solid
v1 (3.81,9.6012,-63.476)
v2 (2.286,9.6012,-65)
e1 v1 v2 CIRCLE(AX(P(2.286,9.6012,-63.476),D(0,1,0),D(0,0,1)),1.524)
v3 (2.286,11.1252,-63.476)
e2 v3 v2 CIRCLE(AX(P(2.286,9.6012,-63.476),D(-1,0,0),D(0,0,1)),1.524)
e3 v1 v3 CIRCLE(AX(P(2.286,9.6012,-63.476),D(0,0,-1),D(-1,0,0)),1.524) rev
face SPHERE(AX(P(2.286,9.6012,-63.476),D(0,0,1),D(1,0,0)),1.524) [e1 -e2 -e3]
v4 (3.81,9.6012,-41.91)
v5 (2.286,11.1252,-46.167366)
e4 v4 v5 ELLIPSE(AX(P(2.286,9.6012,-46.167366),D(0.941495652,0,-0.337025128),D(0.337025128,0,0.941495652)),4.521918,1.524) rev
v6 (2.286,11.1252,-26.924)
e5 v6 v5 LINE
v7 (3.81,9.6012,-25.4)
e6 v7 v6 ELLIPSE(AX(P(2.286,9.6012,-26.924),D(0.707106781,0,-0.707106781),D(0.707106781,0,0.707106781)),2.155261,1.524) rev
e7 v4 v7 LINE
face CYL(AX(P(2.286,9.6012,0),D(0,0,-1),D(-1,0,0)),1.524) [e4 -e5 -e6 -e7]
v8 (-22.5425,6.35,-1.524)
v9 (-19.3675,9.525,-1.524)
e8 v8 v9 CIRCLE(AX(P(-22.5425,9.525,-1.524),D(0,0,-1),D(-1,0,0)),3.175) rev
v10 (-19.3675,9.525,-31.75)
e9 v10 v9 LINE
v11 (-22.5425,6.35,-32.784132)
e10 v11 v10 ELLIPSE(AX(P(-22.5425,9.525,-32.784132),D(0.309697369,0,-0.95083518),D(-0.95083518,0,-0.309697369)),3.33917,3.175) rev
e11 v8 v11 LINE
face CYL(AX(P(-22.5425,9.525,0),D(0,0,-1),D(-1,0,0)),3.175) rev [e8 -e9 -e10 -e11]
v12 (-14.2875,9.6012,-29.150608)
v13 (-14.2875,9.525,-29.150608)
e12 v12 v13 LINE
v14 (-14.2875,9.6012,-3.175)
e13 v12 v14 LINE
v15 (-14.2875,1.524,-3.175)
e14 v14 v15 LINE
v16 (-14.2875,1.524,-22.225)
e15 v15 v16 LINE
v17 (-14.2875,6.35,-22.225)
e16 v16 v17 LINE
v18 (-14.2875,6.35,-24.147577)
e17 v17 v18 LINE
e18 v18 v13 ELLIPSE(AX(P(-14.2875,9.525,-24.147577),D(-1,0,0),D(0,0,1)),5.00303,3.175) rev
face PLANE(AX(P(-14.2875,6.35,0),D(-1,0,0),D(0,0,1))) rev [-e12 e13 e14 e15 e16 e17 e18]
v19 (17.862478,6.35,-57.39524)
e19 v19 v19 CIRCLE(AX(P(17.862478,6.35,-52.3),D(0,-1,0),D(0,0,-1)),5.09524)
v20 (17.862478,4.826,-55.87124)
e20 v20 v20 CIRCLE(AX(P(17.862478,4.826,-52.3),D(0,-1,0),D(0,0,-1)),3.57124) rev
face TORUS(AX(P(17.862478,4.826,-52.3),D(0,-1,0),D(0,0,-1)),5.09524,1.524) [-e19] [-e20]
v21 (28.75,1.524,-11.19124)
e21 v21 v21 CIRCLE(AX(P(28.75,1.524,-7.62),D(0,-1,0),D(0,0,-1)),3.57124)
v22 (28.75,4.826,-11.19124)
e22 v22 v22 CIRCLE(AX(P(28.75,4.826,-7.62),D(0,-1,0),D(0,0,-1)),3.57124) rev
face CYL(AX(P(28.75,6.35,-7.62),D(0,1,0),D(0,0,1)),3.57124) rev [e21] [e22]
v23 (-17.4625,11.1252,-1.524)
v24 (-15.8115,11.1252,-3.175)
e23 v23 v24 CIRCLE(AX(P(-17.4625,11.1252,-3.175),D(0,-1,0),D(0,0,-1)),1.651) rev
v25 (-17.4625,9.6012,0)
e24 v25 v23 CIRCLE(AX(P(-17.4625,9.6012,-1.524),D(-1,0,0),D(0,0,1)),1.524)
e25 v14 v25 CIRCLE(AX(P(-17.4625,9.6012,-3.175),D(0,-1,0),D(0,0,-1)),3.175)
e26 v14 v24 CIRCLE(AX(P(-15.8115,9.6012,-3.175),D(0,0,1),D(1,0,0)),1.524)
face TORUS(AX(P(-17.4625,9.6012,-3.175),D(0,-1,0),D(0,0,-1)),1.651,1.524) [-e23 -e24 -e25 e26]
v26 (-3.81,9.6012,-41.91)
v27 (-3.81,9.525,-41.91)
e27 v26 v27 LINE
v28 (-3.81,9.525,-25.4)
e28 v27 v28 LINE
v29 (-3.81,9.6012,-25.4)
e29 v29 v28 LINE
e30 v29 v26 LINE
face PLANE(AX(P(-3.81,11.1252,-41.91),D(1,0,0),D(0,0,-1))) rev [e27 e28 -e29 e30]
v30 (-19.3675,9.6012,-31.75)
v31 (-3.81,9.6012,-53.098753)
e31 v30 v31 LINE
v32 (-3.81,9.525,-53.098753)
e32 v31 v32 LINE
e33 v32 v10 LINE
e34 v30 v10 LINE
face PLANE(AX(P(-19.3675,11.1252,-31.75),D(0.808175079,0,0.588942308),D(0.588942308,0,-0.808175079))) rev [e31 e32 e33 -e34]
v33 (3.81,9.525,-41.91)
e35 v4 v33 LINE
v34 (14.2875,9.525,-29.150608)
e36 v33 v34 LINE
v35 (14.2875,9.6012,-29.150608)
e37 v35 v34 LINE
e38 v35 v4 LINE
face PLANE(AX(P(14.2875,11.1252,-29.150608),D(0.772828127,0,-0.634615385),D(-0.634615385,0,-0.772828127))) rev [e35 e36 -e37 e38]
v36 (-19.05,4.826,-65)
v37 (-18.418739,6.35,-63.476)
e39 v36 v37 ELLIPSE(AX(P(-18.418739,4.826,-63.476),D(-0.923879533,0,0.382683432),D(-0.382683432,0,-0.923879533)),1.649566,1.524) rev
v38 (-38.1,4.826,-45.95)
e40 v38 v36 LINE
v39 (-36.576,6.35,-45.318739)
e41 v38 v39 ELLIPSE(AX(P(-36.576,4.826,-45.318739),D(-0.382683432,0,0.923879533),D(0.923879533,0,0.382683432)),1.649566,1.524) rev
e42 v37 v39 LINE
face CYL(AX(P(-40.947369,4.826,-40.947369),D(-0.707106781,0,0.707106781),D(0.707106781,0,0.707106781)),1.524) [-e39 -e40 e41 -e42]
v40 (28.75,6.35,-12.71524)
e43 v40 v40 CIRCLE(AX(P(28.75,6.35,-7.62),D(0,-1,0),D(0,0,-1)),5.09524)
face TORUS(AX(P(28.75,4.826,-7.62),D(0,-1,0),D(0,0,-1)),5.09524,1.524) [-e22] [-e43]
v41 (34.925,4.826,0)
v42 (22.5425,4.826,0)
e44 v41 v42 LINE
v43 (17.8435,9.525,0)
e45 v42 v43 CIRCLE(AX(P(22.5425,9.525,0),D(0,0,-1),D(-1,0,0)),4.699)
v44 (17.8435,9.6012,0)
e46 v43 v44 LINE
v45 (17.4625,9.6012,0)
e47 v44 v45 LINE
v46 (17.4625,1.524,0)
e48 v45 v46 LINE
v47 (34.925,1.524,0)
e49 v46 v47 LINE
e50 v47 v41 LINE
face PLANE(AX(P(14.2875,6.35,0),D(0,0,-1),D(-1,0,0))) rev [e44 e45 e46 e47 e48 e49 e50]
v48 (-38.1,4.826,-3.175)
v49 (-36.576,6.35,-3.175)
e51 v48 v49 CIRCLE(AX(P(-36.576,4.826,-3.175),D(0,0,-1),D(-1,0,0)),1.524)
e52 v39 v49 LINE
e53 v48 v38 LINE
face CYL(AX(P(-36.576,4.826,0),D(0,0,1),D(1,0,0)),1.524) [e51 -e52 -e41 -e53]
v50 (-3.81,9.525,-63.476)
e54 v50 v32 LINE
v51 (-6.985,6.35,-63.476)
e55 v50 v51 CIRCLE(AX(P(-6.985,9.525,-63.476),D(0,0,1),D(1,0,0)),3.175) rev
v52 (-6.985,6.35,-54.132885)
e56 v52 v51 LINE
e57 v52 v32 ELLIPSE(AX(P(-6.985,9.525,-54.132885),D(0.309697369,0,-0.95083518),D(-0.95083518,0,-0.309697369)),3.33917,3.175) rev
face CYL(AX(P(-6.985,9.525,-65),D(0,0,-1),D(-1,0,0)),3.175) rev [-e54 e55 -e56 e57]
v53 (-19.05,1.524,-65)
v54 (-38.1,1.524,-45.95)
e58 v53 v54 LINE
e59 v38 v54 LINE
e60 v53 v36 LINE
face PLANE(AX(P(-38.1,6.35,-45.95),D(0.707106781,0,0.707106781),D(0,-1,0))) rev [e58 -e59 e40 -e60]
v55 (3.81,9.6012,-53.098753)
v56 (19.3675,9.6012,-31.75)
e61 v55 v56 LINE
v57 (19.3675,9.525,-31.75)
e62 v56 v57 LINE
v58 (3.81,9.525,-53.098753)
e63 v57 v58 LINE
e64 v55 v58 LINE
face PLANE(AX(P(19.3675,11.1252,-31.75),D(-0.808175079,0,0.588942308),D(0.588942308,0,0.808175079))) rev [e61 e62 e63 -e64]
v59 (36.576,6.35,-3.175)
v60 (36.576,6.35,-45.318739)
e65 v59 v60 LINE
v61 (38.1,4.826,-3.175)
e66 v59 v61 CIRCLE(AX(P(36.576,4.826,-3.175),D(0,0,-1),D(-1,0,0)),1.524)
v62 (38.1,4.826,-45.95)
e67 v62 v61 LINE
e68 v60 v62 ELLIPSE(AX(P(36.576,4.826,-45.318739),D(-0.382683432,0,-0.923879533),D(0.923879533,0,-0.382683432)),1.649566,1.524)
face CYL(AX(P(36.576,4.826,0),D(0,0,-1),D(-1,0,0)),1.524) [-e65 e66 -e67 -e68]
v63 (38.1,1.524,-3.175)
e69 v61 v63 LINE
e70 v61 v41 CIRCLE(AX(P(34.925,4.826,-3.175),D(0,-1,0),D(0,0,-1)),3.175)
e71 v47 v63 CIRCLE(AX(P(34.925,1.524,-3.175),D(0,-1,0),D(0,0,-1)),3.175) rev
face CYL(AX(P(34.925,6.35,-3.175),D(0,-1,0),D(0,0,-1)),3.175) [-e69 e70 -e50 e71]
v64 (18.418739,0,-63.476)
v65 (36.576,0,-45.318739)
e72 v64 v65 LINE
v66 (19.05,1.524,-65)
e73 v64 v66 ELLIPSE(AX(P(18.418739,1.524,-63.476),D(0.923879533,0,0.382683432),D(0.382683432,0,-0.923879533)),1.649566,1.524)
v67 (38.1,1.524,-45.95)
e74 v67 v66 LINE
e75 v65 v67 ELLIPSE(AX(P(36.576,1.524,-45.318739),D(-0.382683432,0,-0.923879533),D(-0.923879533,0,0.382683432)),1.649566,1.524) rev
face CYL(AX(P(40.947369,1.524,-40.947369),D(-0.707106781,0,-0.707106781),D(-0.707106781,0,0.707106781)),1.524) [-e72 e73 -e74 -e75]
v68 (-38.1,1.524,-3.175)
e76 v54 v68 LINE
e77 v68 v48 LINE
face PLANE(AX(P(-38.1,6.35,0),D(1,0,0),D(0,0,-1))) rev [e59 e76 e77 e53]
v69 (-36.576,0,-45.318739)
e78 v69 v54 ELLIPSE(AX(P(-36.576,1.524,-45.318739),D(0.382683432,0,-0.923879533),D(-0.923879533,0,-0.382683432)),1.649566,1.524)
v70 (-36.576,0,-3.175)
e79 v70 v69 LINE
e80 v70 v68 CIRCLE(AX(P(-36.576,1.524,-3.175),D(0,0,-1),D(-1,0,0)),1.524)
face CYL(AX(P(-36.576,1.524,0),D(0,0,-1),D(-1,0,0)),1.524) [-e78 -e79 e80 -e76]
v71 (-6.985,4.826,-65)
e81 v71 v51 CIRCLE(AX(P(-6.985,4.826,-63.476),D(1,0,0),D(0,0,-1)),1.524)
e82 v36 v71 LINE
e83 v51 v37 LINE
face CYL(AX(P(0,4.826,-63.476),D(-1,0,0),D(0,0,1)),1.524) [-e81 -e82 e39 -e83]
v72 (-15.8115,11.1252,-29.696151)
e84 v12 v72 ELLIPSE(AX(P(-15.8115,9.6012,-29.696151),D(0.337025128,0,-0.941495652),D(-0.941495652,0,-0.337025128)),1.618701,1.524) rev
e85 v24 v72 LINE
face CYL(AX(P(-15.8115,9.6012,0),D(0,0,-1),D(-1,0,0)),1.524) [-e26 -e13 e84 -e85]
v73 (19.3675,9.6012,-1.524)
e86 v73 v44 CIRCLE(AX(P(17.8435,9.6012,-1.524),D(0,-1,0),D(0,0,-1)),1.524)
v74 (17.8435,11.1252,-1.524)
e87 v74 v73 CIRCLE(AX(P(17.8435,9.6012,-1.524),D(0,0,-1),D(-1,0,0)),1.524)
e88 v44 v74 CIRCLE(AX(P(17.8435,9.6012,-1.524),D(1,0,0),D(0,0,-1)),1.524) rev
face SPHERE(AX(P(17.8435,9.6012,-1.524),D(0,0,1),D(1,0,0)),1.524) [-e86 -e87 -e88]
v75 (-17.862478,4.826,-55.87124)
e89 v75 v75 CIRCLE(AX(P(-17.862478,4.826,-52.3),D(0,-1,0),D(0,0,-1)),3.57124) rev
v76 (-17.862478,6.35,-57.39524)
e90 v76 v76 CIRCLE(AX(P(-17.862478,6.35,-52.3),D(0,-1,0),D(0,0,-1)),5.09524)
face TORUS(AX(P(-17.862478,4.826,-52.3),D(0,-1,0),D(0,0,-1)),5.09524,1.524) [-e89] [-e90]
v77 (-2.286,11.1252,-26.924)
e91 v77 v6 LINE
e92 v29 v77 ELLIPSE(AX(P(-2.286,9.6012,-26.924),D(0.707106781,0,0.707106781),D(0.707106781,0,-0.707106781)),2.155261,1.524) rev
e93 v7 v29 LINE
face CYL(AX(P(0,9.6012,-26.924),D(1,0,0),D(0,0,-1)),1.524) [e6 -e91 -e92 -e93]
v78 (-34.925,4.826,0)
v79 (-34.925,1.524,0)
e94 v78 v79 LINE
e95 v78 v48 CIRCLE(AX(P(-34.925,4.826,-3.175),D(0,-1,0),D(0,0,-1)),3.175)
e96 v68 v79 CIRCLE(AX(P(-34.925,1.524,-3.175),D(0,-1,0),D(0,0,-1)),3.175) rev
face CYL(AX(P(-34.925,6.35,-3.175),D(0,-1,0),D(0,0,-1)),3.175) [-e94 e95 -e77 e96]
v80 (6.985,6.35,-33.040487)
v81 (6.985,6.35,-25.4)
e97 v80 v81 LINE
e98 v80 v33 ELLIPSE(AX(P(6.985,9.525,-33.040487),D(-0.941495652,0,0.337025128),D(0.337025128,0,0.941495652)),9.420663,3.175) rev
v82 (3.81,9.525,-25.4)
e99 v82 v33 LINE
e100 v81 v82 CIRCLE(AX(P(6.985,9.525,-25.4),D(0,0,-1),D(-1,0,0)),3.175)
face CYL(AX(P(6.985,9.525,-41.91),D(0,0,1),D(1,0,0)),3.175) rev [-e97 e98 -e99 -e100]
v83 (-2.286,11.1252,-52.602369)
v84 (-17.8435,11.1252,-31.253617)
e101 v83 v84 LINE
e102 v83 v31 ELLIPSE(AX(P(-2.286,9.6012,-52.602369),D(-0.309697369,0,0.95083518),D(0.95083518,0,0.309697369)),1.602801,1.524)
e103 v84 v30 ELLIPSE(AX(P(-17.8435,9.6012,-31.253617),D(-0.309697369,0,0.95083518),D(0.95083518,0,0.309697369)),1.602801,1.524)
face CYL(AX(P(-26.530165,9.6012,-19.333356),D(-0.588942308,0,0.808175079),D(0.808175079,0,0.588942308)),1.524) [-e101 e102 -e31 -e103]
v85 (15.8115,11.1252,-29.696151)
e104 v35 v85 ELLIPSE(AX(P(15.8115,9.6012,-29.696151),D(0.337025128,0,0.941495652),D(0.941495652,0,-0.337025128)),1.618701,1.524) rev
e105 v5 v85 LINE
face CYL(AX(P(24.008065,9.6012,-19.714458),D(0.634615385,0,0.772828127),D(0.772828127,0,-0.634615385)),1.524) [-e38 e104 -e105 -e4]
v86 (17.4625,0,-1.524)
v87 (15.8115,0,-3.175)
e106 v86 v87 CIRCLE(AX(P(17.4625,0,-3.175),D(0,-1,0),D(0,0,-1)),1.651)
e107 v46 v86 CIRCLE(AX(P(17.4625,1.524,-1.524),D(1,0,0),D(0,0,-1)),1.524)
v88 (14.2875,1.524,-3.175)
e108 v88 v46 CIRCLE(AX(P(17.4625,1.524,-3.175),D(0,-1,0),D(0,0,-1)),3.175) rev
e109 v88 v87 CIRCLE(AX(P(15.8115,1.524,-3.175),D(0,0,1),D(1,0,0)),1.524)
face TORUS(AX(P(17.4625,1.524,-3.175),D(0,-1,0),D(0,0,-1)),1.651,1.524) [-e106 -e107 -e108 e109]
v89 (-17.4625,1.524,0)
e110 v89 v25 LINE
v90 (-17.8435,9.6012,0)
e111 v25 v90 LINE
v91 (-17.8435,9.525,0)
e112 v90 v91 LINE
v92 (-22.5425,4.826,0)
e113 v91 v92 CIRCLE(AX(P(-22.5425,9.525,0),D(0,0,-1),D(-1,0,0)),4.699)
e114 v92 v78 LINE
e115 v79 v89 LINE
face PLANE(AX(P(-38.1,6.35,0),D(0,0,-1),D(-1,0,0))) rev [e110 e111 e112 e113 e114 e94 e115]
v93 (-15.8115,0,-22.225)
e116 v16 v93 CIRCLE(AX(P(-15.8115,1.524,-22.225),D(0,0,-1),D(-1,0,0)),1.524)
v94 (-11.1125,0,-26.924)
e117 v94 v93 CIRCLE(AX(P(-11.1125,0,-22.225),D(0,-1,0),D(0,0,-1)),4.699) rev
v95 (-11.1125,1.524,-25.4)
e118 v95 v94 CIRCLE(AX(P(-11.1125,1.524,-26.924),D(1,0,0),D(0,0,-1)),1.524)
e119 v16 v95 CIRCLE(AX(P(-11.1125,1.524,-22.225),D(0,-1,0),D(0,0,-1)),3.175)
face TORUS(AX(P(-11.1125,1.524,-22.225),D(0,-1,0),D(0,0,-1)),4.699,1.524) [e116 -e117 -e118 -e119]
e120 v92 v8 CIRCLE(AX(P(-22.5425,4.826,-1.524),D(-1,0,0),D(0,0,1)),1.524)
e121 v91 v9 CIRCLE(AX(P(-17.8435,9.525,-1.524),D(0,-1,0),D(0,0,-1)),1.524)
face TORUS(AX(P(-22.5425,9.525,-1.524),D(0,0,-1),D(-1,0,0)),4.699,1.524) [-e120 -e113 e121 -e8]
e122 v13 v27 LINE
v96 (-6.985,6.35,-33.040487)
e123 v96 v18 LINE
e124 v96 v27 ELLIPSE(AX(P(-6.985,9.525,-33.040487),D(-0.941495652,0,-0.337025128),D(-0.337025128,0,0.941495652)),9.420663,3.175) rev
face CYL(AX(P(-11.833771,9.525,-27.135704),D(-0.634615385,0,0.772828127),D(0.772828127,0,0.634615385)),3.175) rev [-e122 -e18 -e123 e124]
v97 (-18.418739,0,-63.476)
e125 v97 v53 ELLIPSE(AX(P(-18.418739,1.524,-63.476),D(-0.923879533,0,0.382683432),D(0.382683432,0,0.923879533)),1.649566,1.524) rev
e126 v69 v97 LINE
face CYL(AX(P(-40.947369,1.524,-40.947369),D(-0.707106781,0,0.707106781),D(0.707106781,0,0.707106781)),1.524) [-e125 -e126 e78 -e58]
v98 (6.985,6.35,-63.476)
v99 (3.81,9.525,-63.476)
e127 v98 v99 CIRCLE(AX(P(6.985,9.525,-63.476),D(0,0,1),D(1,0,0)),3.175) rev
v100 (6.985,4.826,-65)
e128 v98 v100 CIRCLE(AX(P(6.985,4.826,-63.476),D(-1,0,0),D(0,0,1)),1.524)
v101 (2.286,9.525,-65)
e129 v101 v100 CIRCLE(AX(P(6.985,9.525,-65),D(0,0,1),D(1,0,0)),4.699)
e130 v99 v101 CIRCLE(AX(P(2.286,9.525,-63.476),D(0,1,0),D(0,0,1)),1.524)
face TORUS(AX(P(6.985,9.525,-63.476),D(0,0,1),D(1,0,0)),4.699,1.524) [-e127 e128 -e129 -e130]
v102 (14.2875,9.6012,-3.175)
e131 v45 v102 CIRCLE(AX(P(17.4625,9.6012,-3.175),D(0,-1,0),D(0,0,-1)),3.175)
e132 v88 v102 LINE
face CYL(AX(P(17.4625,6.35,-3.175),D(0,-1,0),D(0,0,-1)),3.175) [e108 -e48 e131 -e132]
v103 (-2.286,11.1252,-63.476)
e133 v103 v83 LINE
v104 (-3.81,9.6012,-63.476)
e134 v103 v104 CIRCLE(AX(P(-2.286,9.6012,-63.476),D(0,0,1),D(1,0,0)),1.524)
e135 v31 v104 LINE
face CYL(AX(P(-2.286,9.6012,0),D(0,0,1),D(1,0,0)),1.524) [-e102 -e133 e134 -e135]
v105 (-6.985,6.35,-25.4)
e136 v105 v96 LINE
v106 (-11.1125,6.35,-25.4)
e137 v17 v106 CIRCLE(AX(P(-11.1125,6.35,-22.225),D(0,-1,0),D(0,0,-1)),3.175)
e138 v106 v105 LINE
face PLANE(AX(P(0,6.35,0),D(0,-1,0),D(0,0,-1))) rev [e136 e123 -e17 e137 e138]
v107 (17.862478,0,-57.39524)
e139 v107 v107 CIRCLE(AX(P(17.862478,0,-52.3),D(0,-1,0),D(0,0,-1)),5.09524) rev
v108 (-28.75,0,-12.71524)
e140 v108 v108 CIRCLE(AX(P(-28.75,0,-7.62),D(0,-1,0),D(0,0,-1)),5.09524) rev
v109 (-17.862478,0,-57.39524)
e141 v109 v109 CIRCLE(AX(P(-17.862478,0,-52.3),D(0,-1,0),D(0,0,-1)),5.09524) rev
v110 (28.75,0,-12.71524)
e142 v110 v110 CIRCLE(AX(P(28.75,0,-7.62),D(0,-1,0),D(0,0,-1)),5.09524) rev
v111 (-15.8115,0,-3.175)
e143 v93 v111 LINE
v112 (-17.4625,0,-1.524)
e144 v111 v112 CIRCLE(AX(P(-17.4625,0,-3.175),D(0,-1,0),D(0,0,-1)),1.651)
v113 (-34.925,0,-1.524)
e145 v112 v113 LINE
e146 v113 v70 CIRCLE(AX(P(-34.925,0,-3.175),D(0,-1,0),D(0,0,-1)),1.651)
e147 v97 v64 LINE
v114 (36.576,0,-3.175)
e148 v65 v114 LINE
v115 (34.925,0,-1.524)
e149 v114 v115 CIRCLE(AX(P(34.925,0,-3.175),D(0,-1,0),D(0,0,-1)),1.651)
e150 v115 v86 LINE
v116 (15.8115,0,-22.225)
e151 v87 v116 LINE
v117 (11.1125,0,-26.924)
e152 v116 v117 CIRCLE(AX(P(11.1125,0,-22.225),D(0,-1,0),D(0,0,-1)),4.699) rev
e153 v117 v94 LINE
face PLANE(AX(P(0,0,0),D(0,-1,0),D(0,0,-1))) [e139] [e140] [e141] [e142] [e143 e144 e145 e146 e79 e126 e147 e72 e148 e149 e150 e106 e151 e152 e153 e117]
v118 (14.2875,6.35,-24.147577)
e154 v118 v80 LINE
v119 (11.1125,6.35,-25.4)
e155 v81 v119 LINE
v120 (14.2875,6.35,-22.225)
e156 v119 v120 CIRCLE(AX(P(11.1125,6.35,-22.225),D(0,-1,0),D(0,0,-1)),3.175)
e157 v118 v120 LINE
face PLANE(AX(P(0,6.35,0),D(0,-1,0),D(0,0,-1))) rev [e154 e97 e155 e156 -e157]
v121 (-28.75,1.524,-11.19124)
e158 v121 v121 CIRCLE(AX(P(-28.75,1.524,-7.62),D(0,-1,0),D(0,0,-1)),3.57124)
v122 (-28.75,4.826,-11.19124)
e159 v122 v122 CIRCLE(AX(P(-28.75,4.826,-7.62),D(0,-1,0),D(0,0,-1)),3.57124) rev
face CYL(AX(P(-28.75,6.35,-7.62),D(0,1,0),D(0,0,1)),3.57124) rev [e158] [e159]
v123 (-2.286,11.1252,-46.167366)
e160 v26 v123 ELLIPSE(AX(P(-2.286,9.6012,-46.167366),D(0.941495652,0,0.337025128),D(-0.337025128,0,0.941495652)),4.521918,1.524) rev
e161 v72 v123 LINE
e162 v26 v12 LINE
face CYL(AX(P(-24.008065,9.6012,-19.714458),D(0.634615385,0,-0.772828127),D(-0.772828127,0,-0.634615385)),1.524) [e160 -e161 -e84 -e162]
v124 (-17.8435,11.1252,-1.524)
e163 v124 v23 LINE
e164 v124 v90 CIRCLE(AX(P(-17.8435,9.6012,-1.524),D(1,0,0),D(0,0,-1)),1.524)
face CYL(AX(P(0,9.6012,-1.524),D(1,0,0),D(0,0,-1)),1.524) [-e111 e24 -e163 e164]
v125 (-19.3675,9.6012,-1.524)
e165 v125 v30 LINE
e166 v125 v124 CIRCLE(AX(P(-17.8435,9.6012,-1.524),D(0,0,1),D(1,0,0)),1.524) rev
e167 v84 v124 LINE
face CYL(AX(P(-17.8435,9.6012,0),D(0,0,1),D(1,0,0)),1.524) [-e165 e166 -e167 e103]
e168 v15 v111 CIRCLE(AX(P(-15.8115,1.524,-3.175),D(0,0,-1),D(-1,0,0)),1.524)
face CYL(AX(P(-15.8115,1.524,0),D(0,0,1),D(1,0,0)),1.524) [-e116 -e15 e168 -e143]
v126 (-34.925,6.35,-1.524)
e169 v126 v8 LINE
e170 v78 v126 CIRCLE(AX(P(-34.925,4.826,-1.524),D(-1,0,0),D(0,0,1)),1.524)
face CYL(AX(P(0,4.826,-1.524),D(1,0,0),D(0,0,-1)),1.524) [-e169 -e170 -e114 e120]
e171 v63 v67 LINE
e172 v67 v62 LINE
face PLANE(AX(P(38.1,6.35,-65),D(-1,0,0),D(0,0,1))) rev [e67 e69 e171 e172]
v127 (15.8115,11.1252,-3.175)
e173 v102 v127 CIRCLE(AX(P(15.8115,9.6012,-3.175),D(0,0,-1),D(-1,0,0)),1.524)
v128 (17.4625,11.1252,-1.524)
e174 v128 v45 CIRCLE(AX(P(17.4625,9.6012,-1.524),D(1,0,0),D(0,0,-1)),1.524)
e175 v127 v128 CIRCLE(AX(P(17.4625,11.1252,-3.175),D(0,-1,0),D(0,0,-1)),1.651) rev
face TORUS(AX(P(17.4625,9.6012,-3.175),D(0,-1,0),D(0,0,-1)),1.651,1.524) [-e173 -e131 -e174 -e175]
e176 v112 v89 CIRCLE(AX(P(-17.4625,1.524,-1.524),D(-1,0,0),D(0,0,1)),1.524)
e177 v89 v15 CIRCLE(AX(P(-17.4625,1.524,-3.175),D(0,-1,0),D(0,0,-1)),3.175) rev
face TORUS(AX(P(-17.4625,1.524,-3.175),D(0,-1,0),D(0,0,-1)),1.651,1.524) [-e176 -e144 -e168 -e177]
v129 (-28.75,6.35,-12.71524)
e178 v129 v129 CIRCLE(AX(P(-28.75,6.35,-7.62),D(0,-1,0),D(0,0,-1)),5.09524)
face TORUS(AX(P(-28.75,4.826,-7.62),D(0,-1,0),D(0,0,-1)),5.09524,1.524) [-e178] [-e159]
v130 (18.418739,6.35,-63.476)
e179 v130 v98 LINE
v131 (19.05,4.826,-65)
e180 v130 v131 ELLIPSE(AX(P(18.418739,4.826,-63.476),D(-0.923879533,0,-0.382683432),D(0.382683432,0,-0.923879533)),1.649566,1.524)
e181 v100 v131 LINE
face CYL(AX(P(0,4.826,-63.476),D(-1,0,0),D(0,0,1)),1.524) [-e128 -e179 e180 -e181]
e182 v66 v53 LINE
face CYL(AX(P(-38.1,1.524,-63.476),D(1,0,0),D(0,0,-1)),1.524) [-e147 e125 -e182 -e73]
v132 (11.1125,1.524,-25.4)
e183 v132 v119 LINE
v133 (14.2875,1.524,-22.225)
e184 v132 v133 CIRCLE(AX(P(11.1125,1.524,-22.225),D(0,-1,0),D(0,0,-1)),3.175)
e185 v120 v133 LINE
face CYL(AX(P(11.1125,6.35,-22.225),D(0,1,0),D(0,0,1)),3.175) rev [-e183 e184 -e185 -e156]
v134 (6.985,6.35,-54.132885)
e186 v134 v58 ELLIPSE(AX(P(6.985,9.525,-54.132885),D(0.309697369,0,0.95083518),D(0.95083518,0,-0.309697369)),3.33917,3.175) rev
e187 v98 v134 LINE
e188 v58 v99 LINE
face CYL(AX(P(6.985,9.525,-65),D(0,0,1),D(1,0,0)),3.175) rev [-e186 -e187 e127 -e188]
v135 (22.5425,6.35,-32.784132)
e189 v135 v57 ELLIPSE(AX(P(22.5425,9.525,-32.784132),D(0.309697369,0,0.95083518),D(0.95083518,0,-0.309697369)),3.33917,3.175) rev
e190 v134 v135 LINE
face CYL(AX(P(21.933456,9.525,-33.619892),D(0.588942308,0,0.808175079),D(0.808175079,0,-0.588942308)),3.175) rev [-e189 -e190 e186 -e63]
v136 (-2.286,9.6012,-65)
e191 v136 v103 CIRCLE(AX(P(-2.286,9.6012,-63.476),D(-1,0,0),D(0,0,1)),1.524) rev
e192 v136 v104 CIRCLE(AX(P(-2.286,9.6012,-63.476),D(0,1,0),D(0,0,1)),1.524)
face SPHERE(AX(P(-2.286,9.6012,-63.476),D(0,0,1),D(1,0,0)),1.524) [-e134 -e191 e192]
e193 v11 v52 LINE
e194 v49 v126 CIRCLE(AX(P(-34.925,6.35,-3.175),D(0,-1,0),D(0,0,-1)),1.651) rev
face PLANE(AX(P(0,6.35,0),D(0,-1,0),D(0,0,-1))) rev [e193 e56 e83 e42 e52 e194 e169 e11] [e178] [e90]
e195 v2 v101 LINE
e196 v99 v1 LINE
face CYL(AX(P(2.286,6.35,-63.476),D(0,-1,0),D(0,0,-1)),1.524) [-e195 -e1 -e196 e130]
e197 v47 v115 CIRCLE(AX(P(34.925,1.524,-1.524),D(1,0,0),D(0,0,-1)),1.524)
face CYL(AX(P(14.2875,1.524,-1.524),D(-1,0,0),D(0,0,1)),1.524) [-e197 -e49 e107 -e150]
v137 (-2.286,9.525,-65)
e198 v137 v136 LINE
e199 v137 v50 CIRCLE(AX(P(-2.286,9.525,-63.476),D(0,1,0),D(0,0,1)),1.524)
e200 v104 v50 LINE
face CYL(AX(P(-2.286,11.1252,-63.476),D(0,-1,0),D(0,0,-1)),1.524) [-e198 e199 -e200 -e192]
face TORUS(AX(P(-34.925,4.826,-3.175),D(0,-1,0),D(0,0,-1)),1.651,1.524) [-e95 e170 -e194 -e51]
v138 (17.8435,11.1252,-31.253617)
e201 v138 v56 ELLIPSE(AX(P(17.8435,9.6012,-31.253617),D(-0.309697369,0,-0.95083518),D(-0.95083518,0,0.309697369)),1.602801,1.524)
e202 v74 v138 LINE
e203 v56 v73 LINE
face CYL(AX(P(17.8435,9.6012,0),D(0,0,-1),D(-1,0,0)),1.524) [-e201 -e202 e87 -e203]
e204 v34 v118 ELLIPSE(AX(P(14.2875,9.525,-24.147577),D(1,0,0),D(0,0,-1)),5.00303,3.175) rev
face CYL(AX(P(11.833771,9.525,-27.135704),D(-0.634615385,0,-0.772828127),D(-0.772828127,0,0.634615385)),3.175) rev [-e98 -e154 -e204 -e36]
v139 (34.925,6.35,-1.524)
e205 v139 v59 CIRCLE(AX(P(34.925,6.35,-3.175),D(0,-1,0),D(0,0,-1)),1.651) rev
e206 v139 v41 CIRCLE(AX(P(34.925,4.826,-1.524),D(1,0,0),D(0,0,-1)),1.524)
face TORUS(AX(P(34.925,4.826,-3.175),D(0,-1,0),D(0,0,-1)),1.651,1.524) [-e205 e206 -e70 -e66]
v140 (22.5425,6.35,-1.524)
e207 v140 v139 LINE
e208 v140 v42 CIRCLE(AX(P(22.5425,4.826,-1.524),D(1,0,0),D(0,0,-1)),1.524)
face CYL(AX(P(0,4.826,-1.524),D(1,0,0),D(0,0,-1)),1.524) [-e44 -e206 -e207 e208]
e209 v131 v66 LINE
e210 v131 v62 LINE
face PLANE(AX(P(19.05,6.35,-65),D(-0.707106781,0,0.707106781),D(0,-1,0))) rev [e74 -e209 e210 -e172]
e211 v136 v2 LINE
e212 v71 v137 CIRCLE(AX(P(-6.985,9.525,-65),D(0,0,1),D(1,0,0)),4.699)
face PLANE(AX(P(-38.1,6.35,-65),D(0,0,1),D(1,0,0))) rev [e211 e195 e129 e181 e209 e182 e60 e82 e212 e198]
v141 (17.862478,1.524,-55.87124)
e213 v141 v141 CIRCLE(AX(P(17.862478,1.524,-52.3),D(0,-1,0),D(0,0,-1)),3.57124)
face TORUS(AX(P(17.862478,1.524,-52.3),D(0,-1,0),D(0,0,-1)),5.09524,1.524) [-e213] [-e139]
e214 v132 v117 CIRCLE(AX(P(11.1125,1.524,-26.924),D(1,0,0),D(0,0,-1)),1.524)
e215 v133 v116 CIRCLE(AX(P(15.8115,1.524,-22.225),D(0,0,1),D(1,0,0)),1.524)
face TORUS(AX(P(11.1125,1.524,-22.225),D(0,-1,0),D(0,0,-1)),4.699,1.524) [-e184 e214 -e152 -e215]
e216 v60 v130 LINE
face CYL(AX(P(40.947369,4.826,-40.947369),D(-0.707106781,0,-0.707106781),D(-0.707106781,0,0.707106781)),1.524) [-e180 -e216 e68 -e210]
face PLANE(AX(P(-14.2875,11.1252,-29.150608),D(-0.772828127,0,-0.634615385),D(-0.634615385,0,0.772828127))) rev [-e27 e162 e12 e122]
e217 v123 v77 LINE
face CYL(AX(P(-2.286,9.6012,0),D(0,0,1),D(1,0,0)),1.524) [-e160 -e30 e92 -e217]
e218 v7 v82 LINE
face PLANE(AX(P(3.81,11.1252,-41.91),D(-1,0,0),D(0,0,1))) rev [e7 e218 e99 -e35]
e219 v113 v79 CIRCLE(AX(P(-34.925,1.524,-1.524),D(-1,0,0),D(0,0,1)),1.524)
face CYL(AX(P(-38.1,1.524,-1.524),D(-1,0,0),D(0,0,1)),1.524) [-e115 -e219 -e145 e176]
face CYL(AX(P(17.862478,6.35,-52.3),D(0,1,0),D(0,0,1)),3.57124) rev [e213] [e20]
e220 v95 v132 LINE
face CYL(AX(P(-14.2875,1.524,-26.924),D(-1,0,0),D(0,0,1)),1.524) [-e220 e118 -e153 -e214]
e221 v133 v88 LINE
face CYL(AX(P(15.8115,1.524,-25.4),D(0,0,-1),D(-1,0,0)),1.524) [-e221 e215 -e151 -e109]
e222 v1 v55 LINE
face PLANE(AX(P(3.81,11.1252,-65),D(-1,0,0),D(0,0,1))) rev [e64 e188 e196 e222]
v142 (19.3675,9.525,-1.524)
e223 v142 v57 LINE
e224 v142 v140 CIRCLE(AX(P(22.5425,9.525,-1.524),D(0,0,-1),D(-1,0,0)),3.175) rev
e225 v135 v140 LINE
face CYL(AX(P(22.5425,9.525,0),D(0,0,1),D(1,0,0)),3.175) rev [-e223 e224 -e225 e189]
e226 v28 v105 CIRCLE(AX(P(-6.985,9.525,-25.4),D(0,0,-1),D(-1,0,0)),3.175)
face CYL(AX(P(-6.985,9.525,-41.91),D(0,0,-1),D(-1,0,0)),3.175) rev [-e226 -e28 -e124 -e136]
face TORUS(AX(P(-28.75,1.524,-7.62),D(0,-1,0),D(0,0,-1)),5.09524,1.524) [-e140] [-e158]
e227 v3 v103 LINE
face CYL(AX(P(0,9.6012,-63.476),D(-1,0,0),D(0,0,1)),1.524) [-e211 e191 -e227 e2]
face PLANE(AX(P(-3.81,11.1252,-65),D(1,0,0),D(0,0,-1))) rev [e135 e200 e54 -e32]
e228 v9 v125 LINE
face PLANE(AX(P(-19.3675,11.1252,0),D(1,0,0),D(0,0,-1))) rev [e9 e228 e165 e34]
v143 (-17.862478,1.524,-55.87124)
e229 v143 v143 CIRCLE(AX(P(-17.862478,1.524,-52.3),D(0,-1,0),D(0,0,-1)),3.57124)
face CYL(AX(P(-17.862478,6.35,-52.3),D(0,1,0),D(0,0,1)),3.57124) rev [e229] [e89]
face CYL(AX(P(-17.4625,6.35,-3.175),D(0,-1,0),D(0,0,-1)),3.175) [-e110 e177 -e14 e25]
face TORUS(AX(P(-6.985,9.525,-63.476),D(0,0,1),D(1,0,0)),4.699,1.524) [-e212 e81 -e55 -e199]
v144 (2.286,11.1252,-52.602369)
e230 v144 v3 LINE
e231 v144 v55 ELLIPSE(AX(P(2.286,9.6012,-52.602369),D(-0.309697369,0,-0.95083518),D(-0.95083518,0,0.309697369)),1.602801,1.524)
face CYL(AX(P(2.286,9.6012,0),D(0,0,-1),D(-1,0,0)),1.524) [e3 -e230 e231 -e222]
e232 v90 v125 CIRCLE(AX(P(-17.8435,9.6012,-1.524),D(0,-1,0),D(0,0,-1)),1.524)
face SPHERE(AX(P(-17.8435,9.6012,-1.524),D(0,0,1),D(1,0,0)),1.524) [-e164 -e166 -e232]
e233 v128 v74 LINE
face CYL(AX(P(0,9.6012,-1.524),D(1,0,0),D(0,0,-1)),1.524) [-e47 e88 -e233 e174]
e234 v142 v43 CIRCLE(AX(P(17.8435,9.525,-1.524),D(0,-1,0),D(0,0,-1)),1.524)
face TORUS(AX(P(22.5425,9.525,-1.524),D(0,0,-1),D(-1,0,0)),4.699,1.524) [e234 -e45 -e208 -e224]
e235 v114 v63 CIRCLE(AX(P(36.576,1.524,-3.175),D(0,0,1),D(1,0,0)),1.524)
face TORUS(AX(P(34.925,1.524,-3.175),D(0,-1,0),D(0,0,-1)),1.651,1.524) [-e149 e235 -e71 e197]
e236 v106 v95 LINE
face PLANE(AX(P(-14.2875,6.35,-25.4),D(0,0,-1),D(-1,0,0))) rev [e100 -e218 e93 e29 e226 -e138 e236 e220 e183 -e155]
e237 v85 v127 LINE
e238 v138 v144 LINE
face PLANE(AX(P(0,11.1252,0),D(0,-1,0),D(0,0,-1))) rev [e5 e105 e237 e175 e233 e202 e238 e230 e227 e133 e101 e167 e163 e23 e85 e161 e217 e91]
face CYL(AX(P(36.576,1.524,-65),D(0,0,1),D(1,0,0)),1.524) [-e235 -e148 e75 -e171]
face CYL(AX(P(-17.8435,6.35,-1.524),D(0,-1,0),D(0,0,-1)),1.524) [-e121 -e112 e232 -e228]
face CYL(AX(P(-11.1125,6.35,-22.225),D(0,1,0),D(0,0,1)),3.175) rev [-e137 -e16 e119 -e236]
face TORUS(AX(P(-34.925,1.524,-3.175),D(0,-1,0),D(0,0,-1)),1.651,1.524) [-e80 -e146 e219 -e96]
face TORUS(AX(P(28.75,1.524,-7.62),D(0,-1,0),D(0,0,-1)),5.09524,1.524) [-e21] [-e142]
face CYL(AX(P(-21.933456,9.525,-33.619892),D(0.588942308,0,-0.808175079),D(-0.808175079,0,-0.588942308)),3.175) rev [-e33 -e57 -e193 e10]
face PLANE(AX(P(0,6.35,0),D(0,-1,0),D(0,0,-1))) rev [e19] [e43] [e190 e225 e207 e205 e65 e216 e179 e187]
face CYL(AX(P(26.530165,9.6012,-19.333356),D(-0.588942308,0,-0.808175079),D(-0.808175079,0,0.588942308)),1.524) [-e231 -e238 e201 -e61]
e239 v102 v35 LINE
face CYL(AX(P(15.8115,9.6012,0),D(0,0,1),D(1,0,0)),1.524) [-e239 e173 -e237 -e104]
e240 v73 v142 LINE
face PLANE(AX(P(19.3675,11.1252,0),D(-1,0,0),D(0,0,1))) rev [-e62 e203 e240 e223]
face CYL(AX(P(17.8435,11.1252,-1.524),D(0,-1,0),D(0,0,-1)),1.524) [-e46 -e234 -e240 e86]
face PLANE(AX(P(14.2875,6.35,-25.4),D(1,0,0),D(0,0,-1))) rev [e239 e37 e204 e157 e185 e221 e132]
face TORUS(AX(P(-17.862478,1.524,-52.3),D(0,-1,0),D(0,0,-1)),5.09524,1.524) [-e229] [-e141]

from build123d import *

# Parameters (mm, degrees)
BOSS_EXTRUDE1_DEPTH     = 6.35
F_1_4_CLEARANCE_HOLE1_D = 7.14248
FILLET1_R               = 3.175
BOSS_EXTRUDE2_DEPTH     = 4.7752
CHAMFER1_SIZE           = 19.05
FILLET2_R               = 3.175
FILLET3_R               = 1.524
FILLET4_R               = 1.524


with BuildPart() as part:
    # Sketch1 → Boss-Extrude1 (new body)
    with BuildSketch(Plane(origin=(0, 0, 0), x_dir=(1, 0, 0), z_dir=(0, 1, 0))):
        Polygon((-38.1, 0), (-14.2875, 0), (-14.2875, 25.4), (14.2875, 25.4), (14.2875, 0), (38.1, 0), (38.1, 65), (-38.1, 65), align=None)
    extrude(amount=BOSS_EXTRUDE1_DEPTH)

    # 1/4 Clearance Hole1 (through all)
    with Locations(Plane(origin=(0, 6.35, 0), x_dir=(1, 0, 0), z_dir=(0, 1, 0))):
        with Locations((-28.75, 7.62), (28.75, 7.62), (17.862477609, 52.3), (-17.862477609, 52.3)):
            Hole(F_1_4_CLEARANCE_HOLE1_D / 2)

    # Fillet1
    fillet1_edges = [part.edges().sort_by_distance(p)[0] for p in [
        (14.2875, 3.175, -25.4),
        (-14.2875, 3.175, -25.4),
    ]]
    fillet(fillet1_edges, radius=FILLET1_R)

    # Sketch4 → Boss-Extrude2 (add)
    with BuildSketch(Plane(origin=(0, 6.35, 0), x_dir=(1, 0, 0), z_dir=(0, 1, 0))):
        Polygon((-14.2875, 29.150607626), (-3.81, 41.91), (-3.81, 25.4), (3.81, 25.4), (3.81, 41.91), (14.2875, 29.150607626), (14.2875, 0), (19.3675, 0), (19.3675, 31.75), (3.81, 53.098752885), (3.81, 65), (-3.81, 65), (-3.81, 53.098752885), (-19.3675, 31.75), (-19.3675, 0), (-14.2875, 0), align=None)
    extrude(amount=BOSS_EXTRUDE2_DEPTH)

    # Chamfer1
    chamfer1_edges = [part.edges().sort_by_distance(p)[0] for p in [
        (-38.1, 3.175, -65),
        (38.1, 3.175, -65),
    ]]
    chamfer(chamfer1_edges, length=CHAMFER1_SIZE)

    # Fillet2
    fillet2_edges = [part.edges().sort_by_distance(p)[0] for p in [
        (38.1, 3.175, 0),
        (14.2875, 5.5626, 0),
        (-14.2875, 5.5626, 0),
        (-38.1, 3.175, 0),
        (-9.04875, 6.35, -35.530303813),
        (-3.81, 6.35, -33.655),
        (3.81, 6.35, -33.655),
        (9.04875, 6.35, -35.530303813),
        (19.3675, 6.35, -15.875),
        (11.58875, 6.35, -42.424376443),
        (3.81, 6.35, -59.049376443),
        (-3.81, 6.35, -59.049376443),
        (-11.58875, 6.35, -42.424376443),
        (-19.3675, 6.35, -15.875),
    ]]
    fillet(fillet2_edges, radius=FILLET2_R)

    # Fillet3
    fillet3_edges = [part.edges().sort_by_distance(p)[0] for p in [
        (18.415, 11.1252, 0),
        (-14.2875, 11.1252, -16.162803813),
        (-15.21743597, 11.1252, -0.92993597),
        (15.21743597, 11.1252, -0.92993597),
        (-9.04875, 11.1252, -35.530303813),
        (-3.81, 11.1252, -33.655),
        (0, 11.1252, -25.4),
        (3.81, 11.1252, -33.655),
        (9.04875, 11.1252, -35.530303813),
        (14.2875, 11.1252, -16.162803813),
        (19.3675, 11.1252, -15.875),
        (11.58875, 11.1252, -42.424376443),
        (3.81, 11.1252, -59.049376443),
        (0, 11.1252, -65),
        (-3.81, 11.1252, -59.049376443),
        (-11.58875, 11.1252, -42.424376443),
        (-19.3675, 11.1252, -15.875),
        (-18.415, 11.1252, 0),
    ]]
    fillet(fillet3_edges, radius=FILLET3_R)

    # Fillet4
    # the kernel refuses this fillet: 1.524 mm, written as the material it takes off along each edge
    with BuildSketch(Plane(origin=(17.8435, 9.6012, -1.524), x_dir=(1, 0, 0), z_dir=(0, 0, 1))) as fillet4_piece_1_section:
        Polygon((0, 0), (FILLET4_R, 0), (FILLET4_R, FILLET4_R), (0, FILLET4_R), align=None)
    fillet4_piece_1 = extrude(amount=FILLET4_R, mode=Mode.PRIVATE)
    fillet4_piece_1 = fillet4_piece_1 - Plane(origin=(17.8435, 9.6012, -1.524), x_dir=(-0.7071067811865475, -0.7071067811865475, 0), z_dir=(0, 0, 1)) * Sphere(FILLET4_R, mode=Mode.PRIVATE)
    add(fillet4_piece_1, mode=Mode.SUBTRACT)
    with BuildSketch(Plane(origin=(2.286, 9.6012, -63.476), x_dir=(1, 0, 0), z_dir=(0, 0, -1))) as fillet4_piece_2_section:
        Polygon((0, 0), (FILLET4_R, 0), (FILLET4_R, -FILLET4_R), (0, -FILLET4_R), align=None)
    fillet4_piece_2 = extrude(amount=FILLET4_R, mode=Mode.PRIVATE)
    fillet4_piece_2 = fillet4_piece_2 - Plane(origin=(2.286, 9.6012, -63.476), x_dir=(-0.7071067811865475, -0.7071067811865475, 0), z_dir=(0, 0, -1)) * Sphere(FILLET4_R, mode=Mode.PRIVATE)
    add(fillet4_piece_2, mode=Mode.SUBTRACT)
    with BuildSketch(Plane(origin=(-2.286, 9.6012, -63.476), x_dir=(-1, 0, 0), z_dir=(0, 0, -1))) as fillet4_piece_3_section:
        Polygon((0, 0), (FILLET4_R, 0), (FILLET4_R, FILLET4_R), (0, FILLET4_R), align=None)
    fillet4_piece_3 = extrude(amount=FILLET4_R, mode=Mode.PRIVATE)
    fillet4_piece_3 = fillet4_piece_3 - Plane(origin=(-2.286, 9.6012, -63.476), x_dir=(0.7071067811865475, -0.7071067811865475, 0), z_dir=(0, 0, -1)) * Sphere(FILLET4_R, mode=Mode.PRIVATE)
    add(fillet4_piece_3, mode=Mode.SUBTRACT)
    with BuildSketch(Plane(origin=(-17.8435, 9.6012, -1.524), x_dir=(-1, 0, 0), z_dir=(0, 0, 1))) as fillet4_piece_4_section:
        Polygon((0, 0), (FILLET4_R, 0), (FILLET4_R, -FILLET4_R), (0, -FILLET4_R), align=None)
    fillet4_piece_4 = extrude(amount=FILLET4_R, mode=Mode.PRIVATE)
    fillet4_piece_4 = fillet4_piece_4 - Plane(origin=(-17.8435, 9.6012, -1.524), x_dir=(0.7071067811865475, -0.7071067811865475, 0), z_dir=(0, 0, 1)) * Sphere(FILLET4_R, mode=Mode.PRIVATE)
    add(fillet4_piece_4, mode=Mode.SUBTRACT)
    with BuildSketch(Plane(origin=(-38.1, 0, -49.76), x_dir=(1, 0, 0), z_dir=(0, 0, 1)), Plane(origin=(38.1, 0, -3.175), x_dir=(-1, 0, 0), z_dir=(0, 0, -1)), Plane(origin=(38.1, 6.35, -3.175), x_dir=(0, -1, 0), z_dir=(0, 0, -1))) as fillet4_piece_5:
        with BuildLine():
            CenterArc((FILLET4_R, FILLET4_R), FILLET4_R, 180, 90)
            Line((0, FILLET4_R), (0, 0))
            Line((0, 0), (FILLET4_R, 0))
        make_face()
    extrude(amount=46.585, mode=Mode.SUBTRACT)
    with BuildSketch(Plane(origin=(-38.1, 6.35, -49.76), x_dir=(1, 0, 0), z_dir=(0, 0, 1))) as fillet4_piece_6:
        with BuildLine():
            CenterArc((FILLET4_R, -FILLET4_R), FILLET4_R, 90, 90)
            Line((0, -FILLET4_R), (0, 0))
            Line((0, 0), (FILLET4_R, 0))
        make_face()
    extrude(amount=46.585, mode=Mode.SUBTRACT)
    with BuildSketch(Plane(origin=(22.86, 0, -65), x_dir=(0, 0, 1), z_dir=(-1, 0, 0))) as fillet4_piece_7:
        with BuildLine():
            CenterArc((FILLET4_R, FILLET4_R), FILLET4_R, 180, 90)
            Line((0, FILLET4_R), (0, 0))
            Line((0, 0), (FILLET4_R, 0))
        make_face()
    extrude(amount=45.72, mode=Mode.SUBTRACT)
    with BuildSketch(Plane(origin=(40.794076836, 0, -43.255923164), x_dir=(-0.7071067811865475, 0, 0.7071067811865475), z_dir=(-0.7071067811865476, 0, -0.7071067811865475)), Plane(origin=(-16.355923164, 0, -67.694076836), x_dir=(0.7071067811865475, 0, 0.7071067811865475), z_dir=(-0.7071067811865476, 0, 0.7071067811865475)), Plane(origin=(40.794076836, 6.35, -43.255923164), x_dir=(0, -1, 0), z_dir=(-0.7071067811865476, 0, -0.7071067811865475))) as fillet4_piece_8:
        with BuildLine():
            CenterArc((FILLET4_R, FILLET4_R), FILLET4_R, 180, 90)
            Line((0, FILLET4_R), (0, 0))
            Line((0, 0), (FILLET4_R, 0))
        make_face()
    extrude(amount=34.560768363, mode=Mode.SUBTRACT)
    with BuildSketch(Plane(origin=(22.86, 6.35, -65), x_dir=(0, -1, 0), z_dir=(-1, 0, 0))) as fillet4_piece_9:
        with BuildLine():
            CenterArc((FILLET4_R, FILLET4_R), FILLET4_R, 180, 90)
            Line((0, FILLET4_R), (0, 0))
            Line((0, 0), (FILLET4_R, 0))
        make_face()
    extrude(amount=15.875, mode=Mode.SUBTRACT)
    with BuildSketch(Plane(origin=(-16.355923164, 6.35, -67.694076836), x_dir=(0.7071067811865475, 0, 0.7071067811865475), z_dir=(-0.7071067811865476, 0, 0.7071067811865475))) as fillet4_piece_10:
        with BuildLine():
            CenterArc((FILLET4_R, -FILLET4_R), FILLET4_R, 90, 90)
            Line((0, -FILLET4_R), (0, 0))
            Line((0, 0), (FILLET4_R, 0))
        make_face()
    extrude(amount=34.560768363, mode=Mode.SUBTRACT)
    with BuildSketch(Plane(origin=(17.4625, 0, 0), x_dir=(0, 0, -1), z_dir=(1, 0, 0))) as fillet4_piece_11:
        with BuildLine():
            CenterArc((FILLET4_R, FILLET4_R), FILLET4_R, 180, 90)
            Line((0, FILLET4_R), (0, 0))
            Line((0, 0), (FILLET4_R, 0))
        make_face()
    extrude(amount=17.4625, mode=Mode.SUBTRACT)
    with BuildSketch(Plane(origin=(22.5425, 6.35, 0), x_dir=(0, -1, 0), z_dir=(1, 0, 0)), Plane(origin=(-34.925, 6.35, 0), x_dir=(0, -1, 0), z_dir=(1, 0, 0))) as fillet4_piece_12:
        with BuildLine():
            CenterArc((FILLET4_R, FILLET4_R), FILLET4_R, 180, 90)
            Line((0, FILLET4_R), (0, 0))
            Line((0, 0), (FILLET4_R, 0))
        make_face()
    extrude(amount=12.3825, mode=Mode.SUBTRACT)
    with BuildSketch(Plane(origin=(-14.2875, 0, -3.175), x_dir=(-1, 0, 0), z_dir=(0, 0, -1)), Plane(origin=(14.2875, 0, -22.225), x_dir=(1, 0, 0), z_dir=(0, 0, 1))) as fillet4_piece_13:
        with BuildLine():
            CenterArc((FILLET4_R, FILLET4_R), FILLET4_R, 180, 90)
            Line((0, FILLET4_R), (0, 0))
            Line((0, 0), (FILLET4_R, 0))
        make_face()
    extrude(amount=19.05, mode=Mode.SUBTRACT)
    with BuildSketch(Plane(origin=(-34.925, 0, 0), x_dir=(0, 1, 0), z_dir=(1, 0, 0))) as fillet4_piece_14:
        with BuildLine():
            CenterArc((FILLET4_R, -FILLET4_R), FILLET4_R, 90, 90)
            Line((0, -FILLET4_R), (0, 0))
            Line((0, 0), (FILLET4_R, 0))
        make_face()
    extrude(amount=17.4625, mode=Mode.SUBTRACT)
    with BuildSketch(Plane(origin=(-34.925, 0, -3.175), x_dir=(-1, 0, 0), z_dir=(0, 0, -1))) as fillet4_piece_15:
        with BuildLine():
            CenterArc((3.175 - FILLET4_R, FILLET4_R), FILLET4_R, 270, 90)
            Line((3.175, FILLET4_R), (3.175, 0))
            Line((3.175, 0), (3.175 - FILLET4_R, 0))
        make_face()
    revolve(axis=Axis((-34.925, 0, -3.175), (0, 1, 0)), revolution_arc=90, mode=Mode.SUBTRACT)
    with BuildSketch(Plane(origin=(34.925, 0, -3.175), x_dir=(1, 0, 0), z_dir=(0, 0, -1))) as fillet4_piece_16:
        with BuildLine():
            CenterArc((3.175 - FILLET4_R, -FILLET4_R), FILLET4_R, 0, 90)
            Line((3.175, -FILLET4_R), (3.175, 0))
            Line((3.175, 0), (3.175 - FILLET4_R, 0))
        make_face()
    revolve(axis=Axis((34.925, 0, -3.175), (0, -1, 0)), revolution_arc=90, mode=Mode.SUBTRACT)
    with BuildSketch(Plane(origin=(-17.4625, 0, -3.175), x_dir=(0, 0, 1), z_dir=(-1, 0, 0))) as fillet4_piece_17:
        with BuildLine():
            CenterArc((3.175 - FILLET4_R, FILLET4_R), FILLET4_R, 270, 90)
            Line((3.175 - FILLET4_R, 0), (3.175, 0))
            Line((3.175, 0), (3.175, FILLET4_R))
        make_face()
    revolve(axis=Axis((-17.4625, 0, -3.175), (0, 1, 0)), revolution_arc=90, mode=Mode.SUBTRACT)
    with BuildSketch(Plane(origin=(17.4625, 0, -3.175), x_dir=(0, 0, 1), z_dir=(1, 0, 0))) as fillet4_piece_18:
        with BuildLine():
            CenterArc((3.175 - FILLET4_R, -FILLET4_R), FILLET4_R, 0, 90)
            Line((3.175, -FILLET4_R), (3.175, 0))
            Line((3.175, 0), (3.175 - FILLET4_R, 0))
        make_face()
    revolve(axis=Axis((17.4625, 0, -3.175), (0, -1, 0)), revolution_arc=90, mode=Mode.SUBTRACT)
    with BuildSketch(Plane(origin=(34.925, 6.35, -3.175), x_dir=(1, 0, 0), z_dir=(0, 0, -1))) as fillet4_piece_19:
        with BuildLine():
            CenterArc((3.175 - FILLET4_R, FILLET4_R), FILLET4_R, 270, 90)
            Line((3.175 - FILLET4_R, 0), (3.175, 0))
            Line((3.175, 0), (3.175, FILLET4_R))
        make_face()
    revolve(axis=Axis((34.925, 6.35, -3.175), (0, -1, 0)), revolution_arc=90, mode=Mode.SUBTRACT)
    with BuildSketch(Plane(origin=(-6.985, 6.35, -65), x_dir=(0, 0, 1), z_dir=(-1, 0, 0))) as fillet4_piece_20:
        with BuildLine():
            CenterArc((FILLET4_R, -FILLET4_R), FILLET4_R, 90, 90)
            Line((0, -FILLET4_R), (0, 0))
            Line((0, 0), (FILLET4_R, 0))
        make_face()
    extrude(amount=15.875, mode=Mode.SUBTRACT)
    with BuildSketch(Plane(origin=(-34.925, 6.35, -3.175), x_dir=(-1, 0, 0), z_dir=(0, 0, -1))) as fillet4_piece_21:
        with BuildLine():
            CenterArc((3.175 - FILLET4_R, -FILLET4_R), FILLET4_R, 0, 90)
            Line((3.175, -FILLET4_R), (3.175, 0))
            Line((3.175, 0), (3.175 - FILLET4_R, 0))
        make_face()
    revolve(axis=Axis((-34.925, 6.35, -3.175), (0, 1, 0)), revolution_arc=90, mode=Mode.SUBTRACT)
    with BuildSketch(Plane(origin=(22.5425, 9.525, 0), x_dir=(0, -1, 0), z_dir=(1, 0, 0))) as fillet4_piece_22:
        with BuildLine():
            CenterArc((3.175 + FILLET4_R, FILLET4_R), FILLET4_R, 180, 90)
            Line((3.175, FILLET4_R), (3.175, 0))
            Line((3.175, 0), (3.175 + FILLET4_R, 0))
        make_face()
    revolve(axis=Axis((22.5425, 9.525, 0), (0, 0, -1)), revolution_arc=90, mode=Mode.SUBTRACT)
    with BuildSketch(Plane(origin=(6.985, 9.525, -65), x_dir=(0, -1, 0), z_dir=(1, 0, 0))) as fillet4_piece_23:
        with BuildLine():
            CenterArc((3.175 + FILLET4_R, -FILLET4_R), FILLET4_R, 90, 90)
            Line((3.175, -FILLET4_R), (3.175, 0))
            Line((3.175, 0), (3.175 + FILLET4_R, 0))
        make_face()
    revolve(axis=Axis((6.985, 9.525, -65), (0, 0, -1)), revolution_arc=90, mode=Mode.SUBTRACT)
    with BuildSketch(Plane(origin=(-6.985, 9.525, -65), x_dir=(0, -1, 0), z_dir=(-1, 0, 0))) as fillet4_piece_24:
        with BuildLine():
            CenterArc((3.175 + FILLET4_R, FILLET4_R), FILLET4_R, 180, 90)
            Line((3.175, FILLET4_R), (3.175, 0))
            Line((3.175, 0), (3.175 + FILLET4_R, 0))
        make_face()
    revolve(axis=Axis((-6.985, 9.525, -65), (0, 0, 1)), revolution_arc=90, mode=Mode.SUBTRACT)
    with BuildSketch(Plane(origin=(-22.5425, 9.525, 0), x_dir=(0, -1, 0), z_dir=(-1, 0, 0))) as fillet4_piece_25:
        with BuildLine():
            CenterArc((3.175 + FILLET4_R, -FILLET4_R), FILLET4_R, 90, 90)
            Line((3.175, -FILLET4_R), (3.175, 0))
            Line((3.175, 0), (3.175 + FILLET4_R, 0))
        make_face()
    revolve(axis=Axis((-22.5425, 9.525, 0), (0, 0, 1)), revolution_arc=90, mode=Mode.SUBTRACT)
    with BuildSketch(Plane(origin=(-19.3675, 9.525, 0), x_dir=(1, 0, 0), z_dir=(0, 1, 0)), Plane(origin=(3.81, 9.525, -65), x_dir=(-1, 0, 0), z_dir=(0, 1, 0))) as fillet4_piece_26:
        with BuildLine():
            CenterArc((FILLET4_R, FILLET4_R), FILLET4_R, 180, 90)
            Line((0, FILLET4_R), (0, 0))
            Line((0, 0), (FILLET4_R, 0))
        make_face()
    extrude(amount=0.0762, mode=Mode.SUBTRACT)
    with BuildSketch(Plane(origin=(19.3675, 9.525, 0), x_dir=(-1, 0, 0), z_dir=(0, 1, 0)), Plane(origin=(-3.81, 9.525, -65), x_dir=(1, 0, 0), z_dir=(0, 1, 0))) as fillet4_piece_27:
        with BuildLine():
            CenterArc((FILLET4_R, -FILLET4_R), FILLET4_R, 90, 90)
            Line((0, -FILLET4_R), (0, 0))
            Line((0, 0), (FILLET4_R, 0))
        make_face()
    extrude(amount=0.0762, mode=Mode.SUBTRACT)
    with BuildSketch(Plane(origin=(-17.862477609, 6.35, -52.3), x_dir=(-1, 0, 0), z_dir=(0, 0, 1))) as fillet4_piece_28:
        with BuildLine():
            CenterArc((3.57124 + FILLET4_R, FILLET4_R), FILLET4_R, 180, 90)
            Line((3.57124, FILLET4_R), (3.57124, 0))
            Line((3.57124, 0), (3.57124 + FILLET4_R, 0))
        make_face()
    revolve(axis=Axis((-17.862477609, 6.35, -52.3), (0, -1, 0)), mode=Mode.SUBTRACT)
    with BuildSketch(Plane(origin=(-17.862477609, 0, -52.3), x_dir=(-1, 0, 0), z_dir=(0, 0, 1))) as fillet4_piece_29:
        with BuildLine():
            CenterArc((3.57124 + FILLET4_R, -FILLET4_R), FILLET4_R, 90, 90)
            Line((3.57124, -FILLET4_R), (3.57124, 0))
            Line((3.57124, 0), (3.57124 + FILLET4_R, 0))
        make_face()
    revolve(axis=Axis((-17.862477609, 0, -52.3), (0, -1, 0)), mode=Mode.SUBTRACT)
    with BuildSketch(Plane(origin=(17.862477609, 6.35, -52.3), x_dir=(-1, 0, 0), z_dir=(0, 0, 1))) as fillet4_piece_30:
        with BuildLine():
            CenterArc((3.57124 + FILLET4_R, FILLET4_R), FILLET4_R, 180, 90)
            Line((3.57124 + FILLET4_R, 0), (3.57124, 0))
            Line((3.57124, 0), (3.57124, FILLET4_R))
        make_face()
    revolve(axis=Axis((17.862477609, 6.35, -52.3), (0, -1, 0)), mode=Mode.SUBTRACT)
    with BuildSketch(Plane(origin=(17.862477609, 0, -52.3), x_dir=(-1, 0, 0), z_dir=(0, 0, 1))) as fillet4_piece_31:
        with BuildLine():
            CenterArc((3.57124 + FILLET4_R, -FILLET4_R), FILLET4_R, 90, 90)
            Line((3.57124, -FILLET4_R), (3.57124, 0))
            Line((3.57124, 0), (3.57124 + FILLET4_R, 0))
        make_face()
    revolve(axis=Axis((17.862477609, 0, -52.3), (0, -1, 0)), mode=Mode.SUBTRACT)
    with BuildSketch(Plane(origin=(28.75, 6.35, -7.62), x_dir=(-1, 0, 0), z_dir=(0, 0, 1))) as fillet4_piece_32:
        with BuildLine():
            CenterArc((3.57124 + FILLET4_R, FILLET4_R), FILLET4_R, 180, 90)
            Line((3.57124 + FILLET4_R, 0), (3.57124, 0))
            Line((3.57124, 0), (3.57124, FILLET4_R))
        make_face()
    revolve(axis=Axis((28.75, 6.35, -7.62), (0, -1, 0)), mode=Mode.SUBTRACT)
    with BuildSketch(Plane(origin=(28.75, 0, -7.62), x_dir=(-1, 0, 0), z_dir=(0, 0, 1))) as fillet4_piece_33:
        with BuildLine():
            CenterArc((3.57124 + FILLET4_R, -FILLET4_R), FILLET4_R, 90, 90)
            Line((3.57124, -FILLET4_R), (3.57124, 0))
            Line((3.57124, 0), (3.57124 + FILLET4_R, 0))
        make_face()
    revolve(axis=Axis((28.75, 0, -7.62), (0, -1, 0)), mode=Mode.SUBTRACT)
    with BuildSketch(Plane(origin=(-28.75, 6.35, -7.62), x_dir=(-1, 0, 0), z_dir=(0, 0, 1))) as fillet4_piece_34:
        with BuildLine():
            CenterArc((3.57124 + FILLET4_R, FILLET4_R), FILLET4_R, 180, 90)
            Line((3.57124, FILLET4_R), (3.57124, 0))
            Line((3.57124, 0), (3.57124 + FILLET4_R, 0))
        make_face()
    revolve(axis=Axis((-28.75, 6.35, -7.62), (0, -1, 0)), mode=Mode.SUBTRACT)
    with BuildSketch(Plane(origin=(-28.75, 0, -7.62), x_dir=(-1, 0, 0), z_dir=(0, 0, 1))) as fillet4_piece_35:
        with BuildLine():
            CenterArc((3.57124 + FILLET4_R, -FILLET4_R), FILLET4_R, 90, 90)
            Line((3.57124, -FILLET4_R), (3.57124, 0))
            Line((3.57124, 0), (3.57124 + FILLET4_R, 0))
        make_face()
    revolve(axis=Axis((-28.75, 0, -7.62), (0, -1, 0)), mode=Mode.SUBTRACT)
    with BuildSketch(Plane(origin=(-11.1125, 0, -25.4), x_dir=(0, 0, -1), z_dir=(1, 0, 0))) as fillet4_piece_36:
        with BuildLine():
            CenterArc((FILLET4_R, FILLET4_R), FILLET4_R, 180, 90)
            Line((0, FILLET4_R), (0, 0))
            Line((0, 0), (FILLET4_R, 0))
        make_face()
    extrude(amount=22.225, mode=Mode.SUBTRACT)
    with BuildSketch(Plane(origin=(11.1125, 0, -22.225), x_dir=(0, 0, -1), z_dir=(-1, 0, 0))) as fillet4_piece_37:
        with BuildLine():
            CenterArc((3.175 + FILLET4_R, -FILLET4_R), FILLET4_R, 90, 90)
            Line((3.175, -FILLET4_R), (3.175, 0))
            Line((3.175, 0), (3.175 + FILLET4_R, 0))
        make_face()
    revolve(axis=Axis((11.1125, 0, -22.225), (0, -1, 0)), revolution_arc=90, mode=Mode.SUBTRACT)
    with BuildSketch(Plane(origin=(-11.1125, 0, -22.225), x_dir=(-1, 0, 0), z_dir=(0, 0, 1))) as fillet4_piece_38:
        with BuildLine():
            CenterArc((3.175 + FILLET4_R, -FILLET4_R), FILLET4_R, 90, 90)
            Line((3.175, -FILLET4_R), (3.175, 0))
            Line((3.175, 0), (3.175 + FILLET4_R, 0))
        make_face()
    revolve(axis=Axis((-11.1125, 0, -22.225), (0, -1, 0)), revolution_arc=90, mode=Mode.SUBTRACT)


solid = part.part
